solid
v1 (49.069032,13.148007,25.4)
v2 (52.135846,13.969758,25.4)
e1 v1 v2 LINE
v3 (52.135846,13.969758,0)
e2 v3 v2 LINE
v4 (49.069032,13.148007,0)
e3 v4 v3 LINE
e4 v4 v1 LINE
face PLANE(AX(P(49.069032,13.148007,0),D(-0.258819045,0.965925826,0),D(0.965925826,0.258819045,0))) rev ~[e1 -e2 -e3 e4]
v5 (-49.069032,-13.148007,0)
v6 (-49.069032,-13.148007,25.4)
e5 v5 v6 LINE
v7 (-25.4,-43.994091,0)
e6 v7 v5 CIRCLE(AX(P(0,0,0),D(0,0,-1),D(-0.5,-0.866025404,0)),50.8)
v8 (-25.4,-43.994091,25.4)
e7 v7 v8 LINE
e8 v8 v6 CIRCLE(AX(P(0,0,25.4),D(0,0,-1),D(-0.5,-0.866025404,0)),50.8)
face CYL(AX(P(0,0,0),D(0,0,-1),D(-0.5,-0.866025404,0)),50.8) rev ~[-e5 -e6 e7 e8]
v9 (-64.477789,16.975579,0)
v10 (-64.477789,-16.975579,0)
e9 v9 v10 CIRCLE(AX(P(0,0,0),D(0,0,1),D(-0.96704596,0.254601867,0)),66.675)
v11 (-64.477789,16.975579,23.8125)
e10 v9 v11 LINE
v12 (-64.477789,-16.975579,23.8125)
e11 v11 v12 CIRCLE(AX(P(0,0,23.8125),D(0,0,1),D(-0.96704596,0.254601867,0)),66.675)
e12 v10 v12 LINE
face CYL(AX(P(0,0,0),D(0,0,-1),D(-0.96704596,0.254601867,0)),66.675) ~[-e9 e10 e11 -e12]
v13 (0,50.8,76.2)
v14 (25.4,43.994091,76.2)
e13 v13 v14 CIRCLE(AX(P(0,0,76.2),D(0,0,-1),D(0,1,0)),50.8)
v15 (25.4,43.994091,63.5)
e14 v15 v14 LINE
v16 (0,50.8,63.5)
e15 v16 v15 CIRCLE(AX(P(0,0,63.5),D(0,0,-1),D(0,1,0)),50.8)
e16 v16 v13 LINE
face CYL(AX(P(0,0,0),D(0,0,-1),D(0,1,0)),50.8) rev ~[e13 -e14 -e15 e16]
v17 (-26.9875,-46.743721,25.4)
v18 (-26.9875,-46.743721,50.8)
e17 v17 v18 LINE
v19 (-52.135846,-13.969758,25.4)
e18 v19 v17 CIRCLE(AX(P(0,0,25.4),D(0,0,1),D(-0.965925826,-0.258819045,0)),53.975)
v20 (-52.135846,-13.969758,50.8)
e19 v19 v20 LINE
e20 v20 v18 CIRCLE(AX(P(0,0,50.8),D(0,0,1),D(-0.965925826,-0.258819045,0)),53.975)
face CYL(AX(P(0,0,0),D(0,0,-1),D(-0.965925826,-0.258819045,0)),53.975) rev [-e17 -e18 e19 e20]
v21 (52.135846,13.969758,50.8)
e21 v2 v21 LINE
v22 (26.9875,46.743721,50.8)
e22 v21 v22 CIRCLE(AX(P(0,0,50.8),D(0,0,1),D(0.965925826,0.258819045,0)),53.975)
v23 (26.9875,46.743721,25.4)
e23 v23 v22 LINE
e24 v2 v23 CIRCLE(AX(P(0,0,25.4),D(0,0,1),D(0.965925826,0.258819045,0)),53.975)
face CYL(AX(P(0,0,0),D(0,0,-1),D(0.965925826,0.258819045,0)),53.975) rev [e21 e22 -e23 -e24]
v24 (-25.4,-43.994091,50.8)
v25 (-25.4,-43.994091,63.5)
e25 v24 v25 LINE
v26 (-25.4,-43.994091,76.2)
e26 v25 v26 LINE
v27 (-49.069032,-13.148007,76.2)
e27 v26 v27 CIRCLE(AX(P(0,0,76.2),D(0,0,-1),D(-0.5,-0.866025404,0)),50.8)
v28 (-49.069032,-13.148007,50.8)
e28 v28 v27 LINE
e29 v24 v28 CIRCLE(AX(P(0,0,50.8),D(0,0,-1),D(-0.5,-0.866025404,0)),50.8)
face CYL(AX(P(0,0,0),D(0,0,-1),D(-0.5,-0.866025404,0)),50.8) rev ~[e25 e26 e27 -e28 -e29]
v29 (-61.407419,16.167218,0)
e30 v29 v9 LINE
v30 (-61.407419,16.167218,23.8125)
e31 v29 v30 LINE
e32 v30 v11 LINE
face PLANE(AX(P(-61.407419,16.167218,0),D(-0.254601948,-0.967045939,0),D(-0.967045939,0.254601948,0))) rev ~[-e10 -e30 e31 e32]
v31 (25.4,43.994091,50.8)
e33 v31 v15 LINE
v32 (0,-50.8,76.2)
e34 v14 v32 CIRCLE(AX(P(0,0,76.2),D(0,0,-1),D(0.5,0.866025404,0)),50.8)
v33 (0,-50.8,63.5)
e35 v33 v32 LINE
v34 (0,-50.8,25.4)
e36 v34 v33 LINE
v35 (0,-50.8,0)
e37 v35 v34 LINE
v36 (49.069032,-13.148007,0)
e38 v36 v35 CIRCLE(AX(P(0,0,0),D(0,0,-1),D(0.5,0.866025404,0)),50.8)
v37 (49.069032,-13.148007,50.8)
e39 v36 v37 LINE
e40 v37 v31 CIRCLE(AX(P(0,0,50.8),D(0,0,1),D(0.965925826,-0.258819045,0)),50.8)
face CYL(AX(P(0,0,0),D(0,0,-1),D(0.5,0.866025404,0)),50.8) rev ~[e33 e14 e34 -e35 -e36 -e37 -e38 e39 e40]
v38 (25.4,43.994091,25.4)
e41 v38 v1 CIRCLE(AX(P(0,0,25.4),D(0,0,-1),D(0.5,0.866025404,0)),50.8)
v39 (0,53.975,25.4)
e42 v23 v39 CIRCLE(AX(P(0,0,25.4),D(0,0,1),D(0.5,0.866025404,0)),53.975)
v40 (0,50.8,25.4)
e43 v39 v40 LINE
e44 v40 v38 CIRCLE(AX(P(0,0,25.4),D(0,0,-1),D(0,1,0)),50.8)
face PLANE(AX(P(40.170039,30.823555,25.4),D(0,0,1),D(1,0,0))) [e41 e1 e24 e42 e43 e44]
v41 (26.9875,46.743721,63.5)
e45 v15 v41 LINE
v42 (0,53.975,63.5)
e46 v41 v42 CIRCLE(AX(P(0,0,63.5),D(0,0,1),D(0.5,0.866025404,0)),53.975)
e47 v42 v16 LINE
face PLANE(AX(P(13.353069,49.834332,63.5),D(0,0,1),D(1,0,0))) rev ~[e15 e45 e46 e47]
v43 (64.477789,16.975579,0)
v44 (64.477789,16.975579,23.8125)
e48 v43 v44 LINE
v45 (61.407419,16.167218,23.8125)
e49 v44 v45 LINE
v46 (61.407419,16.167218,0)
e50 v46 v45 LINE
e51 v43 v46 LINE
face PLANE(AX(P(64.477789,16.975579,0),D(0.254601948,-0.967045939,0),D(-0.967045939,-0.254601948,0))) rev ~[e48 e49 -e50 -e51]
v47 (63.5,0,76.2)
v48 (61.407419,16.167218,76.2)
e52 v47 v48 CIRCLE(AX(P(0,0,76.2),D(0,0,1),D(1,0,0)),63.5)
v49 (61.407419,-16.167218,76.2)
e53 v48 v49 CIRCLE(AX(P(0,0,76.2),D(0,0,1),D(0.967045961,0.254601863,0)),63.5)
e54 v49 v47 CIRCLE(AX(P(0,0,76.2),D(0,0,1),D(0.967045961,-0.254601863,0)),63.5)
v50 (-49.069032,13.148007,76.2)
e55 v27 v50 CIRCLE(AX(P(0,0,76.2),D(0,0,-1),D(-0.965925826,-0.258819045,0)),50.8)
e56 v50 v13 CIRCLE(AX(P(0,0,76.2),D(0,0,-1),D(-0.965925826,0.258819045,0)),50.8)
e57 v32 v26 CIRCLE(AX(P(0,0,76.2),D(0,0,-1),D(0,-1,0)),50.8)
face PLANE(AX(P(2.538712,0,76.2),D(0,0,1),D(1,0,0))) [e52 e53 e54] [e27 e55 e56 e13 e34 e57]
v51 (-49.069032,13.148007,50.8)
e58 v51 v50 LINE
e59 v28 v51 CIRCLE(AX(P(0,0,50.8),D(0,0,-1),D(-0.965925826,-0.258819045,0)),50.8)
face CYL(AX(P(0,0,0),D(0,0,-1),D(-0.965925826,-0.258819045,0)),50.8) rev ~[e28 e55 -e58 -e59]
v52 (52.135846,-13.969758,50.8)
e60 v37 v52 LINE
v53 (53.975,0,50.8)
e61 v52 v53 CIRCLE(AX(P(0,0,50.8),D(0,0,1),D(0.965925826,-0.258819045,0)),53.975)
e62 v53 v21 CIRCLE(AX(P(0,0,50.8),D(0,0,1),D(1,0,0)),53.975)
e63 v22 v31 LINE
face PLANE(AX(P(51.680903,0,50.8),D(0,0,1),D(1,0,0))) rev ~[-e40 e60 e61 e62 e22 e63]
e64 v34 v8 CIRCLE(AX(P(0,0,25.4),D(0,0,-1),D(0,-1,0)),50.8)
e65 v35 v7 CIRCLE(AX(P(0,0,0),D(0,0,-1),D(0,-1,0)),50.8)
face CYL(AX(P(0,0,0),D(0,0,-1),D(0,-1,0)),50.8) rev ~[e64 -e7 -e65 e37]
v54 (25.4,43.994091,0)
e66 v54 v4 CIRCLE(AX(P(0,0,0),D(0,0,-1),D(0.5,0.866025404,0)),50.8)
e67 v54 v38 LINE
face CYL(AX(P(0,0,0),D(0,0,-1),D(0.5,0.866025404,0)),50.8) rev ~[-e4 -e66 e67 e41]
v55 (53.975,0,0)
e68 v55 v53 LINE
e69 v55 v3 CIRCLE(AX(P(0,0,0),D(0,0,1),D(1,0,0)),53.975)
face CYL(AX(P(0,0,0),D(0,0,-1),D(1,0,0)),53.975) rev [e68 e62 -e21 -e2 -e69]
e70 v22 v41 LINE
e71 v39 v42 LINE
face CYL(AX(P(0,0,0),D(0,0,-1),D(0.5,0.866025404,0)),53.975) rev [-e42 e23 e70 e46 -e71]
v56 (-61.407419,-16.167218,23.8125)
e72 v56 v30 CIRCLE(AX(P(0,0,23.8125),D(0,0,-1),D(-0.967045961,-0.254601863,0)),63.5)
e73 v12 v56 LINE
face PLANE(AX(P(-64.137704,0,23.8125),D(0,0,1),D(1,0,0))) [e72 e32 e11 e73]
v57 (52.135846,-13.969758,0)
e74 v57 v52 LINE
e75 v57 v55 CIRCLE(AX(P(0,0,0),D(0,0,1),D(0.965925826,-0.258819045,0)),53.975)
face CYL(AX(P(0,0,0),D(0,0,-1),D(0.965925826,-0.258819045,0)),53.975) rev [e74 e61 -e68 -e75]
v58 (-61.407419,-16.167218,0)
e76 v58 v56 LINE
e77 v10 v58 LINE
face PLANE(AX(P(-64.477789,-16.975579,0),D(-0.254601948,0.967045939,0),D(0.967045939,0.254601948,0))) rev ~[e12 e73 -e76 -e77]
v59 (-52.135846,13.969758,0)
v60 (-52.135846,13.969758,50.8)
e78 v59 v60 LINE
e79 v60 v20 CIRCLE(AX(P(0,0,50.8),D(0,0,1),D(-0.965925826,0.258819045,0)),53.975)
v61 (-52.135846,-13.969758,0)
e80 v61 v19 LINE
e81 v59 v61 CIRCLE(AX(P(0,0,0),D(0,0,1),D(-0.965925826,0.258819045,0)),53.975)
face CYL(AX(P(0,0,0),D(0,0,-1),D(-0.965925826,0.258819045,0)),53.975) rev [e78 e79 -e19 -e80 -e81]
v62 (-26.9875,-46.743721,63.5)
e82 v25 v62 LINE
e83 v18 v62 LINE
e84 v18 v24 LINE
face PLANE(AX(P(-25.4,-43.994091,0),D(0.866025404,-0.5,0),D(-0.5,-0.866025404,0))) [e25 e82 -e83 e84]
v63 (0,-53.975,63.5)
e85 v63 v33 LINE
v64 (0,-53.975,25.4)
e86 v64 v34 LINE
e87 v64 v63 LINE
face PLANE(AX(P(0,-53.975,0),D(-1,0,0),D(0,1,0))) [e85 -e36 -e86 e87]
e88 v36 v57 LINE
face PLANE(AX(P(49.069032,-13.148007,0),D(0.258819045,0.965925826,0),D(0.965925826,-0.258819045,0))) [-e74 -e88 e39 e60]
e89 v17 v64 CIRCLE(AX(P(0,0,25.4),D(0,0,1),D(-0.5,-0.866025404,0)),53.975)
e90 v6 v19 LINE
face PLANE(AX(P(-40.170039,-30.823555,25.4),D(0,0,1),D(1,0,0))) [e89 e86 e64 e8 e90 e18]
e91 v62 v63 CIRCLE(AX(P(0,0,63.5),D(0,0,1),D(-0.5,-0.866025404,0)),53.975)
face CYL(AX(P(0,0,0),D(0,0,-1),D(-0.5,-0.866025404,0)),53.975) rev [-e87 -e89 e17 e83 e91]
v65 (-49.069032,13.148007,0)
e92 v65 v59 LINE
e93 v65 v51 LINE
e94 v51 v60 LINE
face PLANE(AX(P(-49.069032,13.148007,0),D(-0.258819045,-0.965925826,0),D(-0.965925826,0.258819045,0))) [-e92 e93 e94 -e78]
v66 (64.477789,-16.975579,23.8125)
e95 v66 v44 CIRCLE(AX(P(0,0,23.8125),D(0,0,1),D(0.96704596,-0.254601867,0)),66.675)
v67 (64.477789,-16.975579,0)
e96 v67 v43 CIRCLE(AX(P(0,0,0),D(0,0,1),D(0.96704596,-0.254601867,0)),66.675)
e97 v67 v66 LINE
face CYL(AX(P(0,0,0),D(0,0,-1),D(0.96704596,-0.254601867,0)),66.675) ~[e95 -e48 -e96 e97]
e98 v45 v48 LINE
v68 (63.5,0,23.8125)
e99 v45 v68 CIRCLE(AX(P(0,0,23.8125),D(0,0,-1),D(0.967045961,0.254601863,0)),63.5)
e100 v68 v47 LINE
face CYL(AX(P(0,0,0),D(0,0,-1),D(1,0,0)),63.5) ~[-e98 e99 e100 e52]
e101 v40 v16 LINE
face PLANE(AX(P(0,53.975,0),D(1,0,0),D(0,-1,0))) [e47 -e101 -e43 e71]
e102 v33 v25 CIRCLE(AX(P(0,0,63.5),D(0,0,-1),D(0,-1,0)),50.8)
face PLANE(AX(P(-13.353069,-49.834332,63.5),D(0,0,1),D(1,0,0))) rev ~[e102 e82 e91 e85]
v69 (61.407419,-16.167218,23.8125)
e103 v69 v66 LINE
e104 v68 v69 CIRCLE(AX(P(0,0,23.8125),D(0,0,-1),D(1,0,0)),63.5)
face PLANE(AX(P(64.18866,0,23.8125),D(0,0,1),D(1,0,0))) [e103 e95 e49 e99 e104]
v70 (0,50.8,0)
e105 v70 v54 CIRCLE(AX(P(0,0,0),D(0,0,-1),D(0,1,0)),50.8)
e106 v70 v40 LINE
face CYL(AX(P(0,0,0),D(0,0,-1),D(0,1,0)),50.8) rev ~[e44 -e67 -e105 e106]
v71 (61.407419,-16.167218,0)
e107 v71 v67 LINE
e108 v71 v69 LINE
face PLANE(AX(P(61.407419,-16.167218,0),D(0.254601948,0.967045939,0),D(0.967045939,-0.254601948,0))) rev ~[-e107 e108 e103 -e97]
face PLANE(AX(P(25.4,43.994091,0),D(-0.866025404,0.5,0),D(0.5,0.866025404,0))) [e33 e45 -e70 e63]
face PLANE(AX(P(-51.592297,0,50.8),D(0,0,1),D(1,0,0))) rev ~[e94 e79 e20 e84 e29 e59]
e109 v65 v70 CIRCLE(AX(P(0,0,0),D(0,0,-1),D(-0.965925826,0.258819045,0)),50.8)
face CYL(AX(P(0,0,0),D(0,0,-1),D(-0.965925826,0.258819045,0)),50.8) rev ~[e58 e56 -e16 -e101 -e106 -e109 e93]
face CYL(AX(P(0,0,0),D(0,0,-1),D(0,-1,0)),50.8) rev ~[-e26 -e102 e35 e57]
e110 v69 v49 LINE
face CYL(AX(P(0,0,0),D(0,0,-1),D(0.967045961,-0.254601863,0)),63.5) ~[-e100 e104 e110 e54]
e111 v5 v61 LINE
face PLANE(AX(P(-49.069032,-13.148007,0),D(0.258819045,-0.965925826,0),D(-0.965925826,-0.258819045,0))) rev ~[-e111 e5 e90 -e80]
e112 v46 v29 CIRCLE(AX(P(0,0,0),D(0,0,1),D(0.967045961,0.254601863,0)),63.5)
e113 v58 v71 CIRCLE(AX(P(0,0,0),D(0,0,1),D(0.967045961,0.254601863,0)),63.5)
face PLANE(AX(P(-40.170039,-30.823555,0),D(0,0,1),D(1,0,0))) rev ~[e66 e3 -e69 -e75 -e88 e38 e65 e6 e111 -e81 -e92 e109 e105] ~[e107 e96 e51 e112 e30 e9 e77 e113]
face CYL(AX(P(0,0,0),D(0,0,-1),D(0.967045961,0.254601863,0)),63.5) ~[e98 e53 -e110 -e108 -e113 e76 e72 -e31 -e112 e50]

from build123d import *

# Parameters (mm, degrees)
F1_DEPTH = 76.2
F2_DEPTH = 23.8125
F3_DEPTH = 50.8
F4_DEPTH = 63.5
F5_DEPTH = 25.4


# Not quite as in the source:
# - a feature names something its author has since deleted; it is built from what else it names


with BuildPart() as f1:
    # F0 (on Top) → F1 (new body)
    with BuildSketch(Plane.XY):
        with BuildLine():
            ThreePointArc((61.4074185531, -16.1672182717), (62.9746817305, -8.151040482), (63.5, 0))
            ThreePointArc((63.5, 0), (62.9746817305, 8.151040482), (61.4074185531, 16.1672182717))
            ThreePointArc((61.4074185531, 16.1672182717), (0, 63.5), (-61.4074185531, 16.1672182717))
            ThreePointArc((-61.4074185531, 16.1672182717), (-63.5, 0), (-61.4074185531, -16.1672182717))
            ThreePointArc((-61.4074185531, -16.1672182717), (0, -63.5), (61.4074185531, -16.1672182717))
        make_face()
        with BuildLine():
            ThreePointArc((26.9875, 46.7437211693), (42.8212465422, 32.8578981307), (52.135846474, 13.9697579594))
            ThreePointArc((52.135846474, 13.9697579594), (53.5132363927, 7.0451512251), (53.975, 0))
            ThreePointArc((53.975, 0), (53.5132363927, -7.0451512251), (52.135846474, -13.9697579594))
            ThreePointArc((52.135846474, -13.9697579594), (32.8578981307, -42.8212465422), (0, -53.975))
            ThreePointArc((0, -53.975), (-13.9697579594, -52.135846474), (-26.9875, -46.7437211693))
            ThreePointArc((-26.9875, -46.7437211693), (-42.8212465422, -32.8578981307), (-52.135846474, -13.9697579594))
            ThreePointArc((-52.135846474, -13.9697579594), (-53.975, 0), (-52.135846474, 13.9697579594))
            ThreePointArc((-52.135846474, 13.9697579594), (-32.8578981307, 42.8212465422), (0, 53.975))
            ThreePointArc((0, 53.975), (13.9697579594, 52.135846474), (26.9875, 46.7437211693))
        make_face(mode=Mode.SUBTRACT)
        with BuildLine():
            ThreePointArc((49.0690319755, 13.1480074912), (50.3653989578, 6.6307305648), (50.8, 0))
            ThreePointArc((50.8, 0), (50.3653989578, -6.6307305648), (49.0690319755, -13.1480074912))
            Line((49.0690319755, -13.1480074912), (52.135846474, -13.9697579594))
            ThreePointArc((52.135846474, -13.9697579594), (53.5132363927, -7.0451512251), (53.975, 0))
            ThreePointArc((53.975, 0), (53.5132363927, 7.0451512251), (52.135846474, 13.9697579594))
            Line((52.135846474, 13.9697579594), (49.0690319755, 13.1480074912))
        make_face()
        with BuildLine():
            ThreePointArc((25.4, 43.9940905122), (40.3023496868, 30.9250805936), (49.0690319755, 13.1480074912))
            Line((49.0690319755, 13.1480074912), (52.135846474, 13.9697579594))
            ThreePointArc((52.135846474, 13.9697579594), (42.8212465422, 32.8578981307), (26.9875, 46.7437211693))
            Line((26.9875, 46.7437211693), (25.4, 43.9940905122))
        make_face()
        with BuildLine():
            Line((52.135846474, -13.9697579594), (49.0690319755, -13.1480074912))
            ThreePointArc((49.0690319755, -13.1480074912), (30.9250805936, -40.3023496868), (0, -50.8))
            Line((0, -50.8), (0, -53.975))
            ThreePointArc((0, -53.975), (32.8578981307, -42.8212465422), (52.135846474, -13.9697579594))
        make_face()
        with BuildLine():
            ThreePointArc((0, 50.8), (13.1480074912, 49.0690319755), (25.4, 43.9940905122))
            Line((25.4, 43.9940905122), (26.9875, 46.7437211693))
            ThreePointArc((26.9875, 46.7437211693), (13.9697579594, 52.135846474), (0, 53.975))
            Line((0, 53.975), (0, 50.8))
        make_face()
        with BuildLine():
            Line((0, -53.975), (0, -50.8))
            ThreePointArc((0, -50.8), (-13.1480074912, -49.0690319755), (-25.4, -43.9940905122))
            Line((-25.4, -43.9940905122), (-26.9875, -46.7437211693))
            ThreePointArc((-26.9875, -46.7437211693), (-13.9697579594, -52.135846474), (0, -53.975))
        make_face()
        with BuildLine():
            ThreePointArc((-49.0690319755, 13.1480074912), (-30.9250805936, 40.3023496868), (0, 50.8))
            Line((0, 50.8), (0, 53.975))
            ThreePointArc((0, 53.975), (-32.8578981307, 42.8212465422), (-52.135846474, 13.9697579594))
            Line((-52.135846474, 13.9697579594), (-49.0690319755, 13.1480074912))
        make_face()
        with BuildLine():
            Line((-26.9875, -46.7437211693), (-25.4, -43.9940905122))
            ThreePointArc((-25.4, -43.9940905122), (-40.3023496868, -30.9250805936), (-49.0690319755, -13.1480074912))
            Line((-49.0690319755, -13.1480074912), (-52.135846474, -13.9697579594))
            ThreePointArc((-52.135846474, -13.9697579594), (-42.8212465422, -32.8578981307), (-26.9875, -46.7437211693))
        make_face()
        with BuildLine():
            ThreePointArc((-49.0690319755, -13.1480074912), (-50.8, 0), (-49.0690319755, 13.1480074912))
            Line((-49.0690319755, 13.1480074912), (-52.135846474, 13.9697579594))
            ThreePointArc((-52.135846474, 13.9697579594), (-53.975, 0), (-52.135846474, -13.9697579594))
            Line((-52.135846474, -13.9697579594), (-49.0690319755, -13.1480074912))
        make_face()
    extrude(amount=F1_DEPTH)

    # F0 (on Top) → F2 (join)
    with BuildSketch(Plane.XY):
        with BuildLine():
            ThreePointArc((-61.4074185531, -16.1672182717), (-63.5, 0), (-61.4074185531, 16.1672182717))
            Line((-61.4074185531, 16.1672182717), (-64.4777894091, 16.9755794573))
            ThreePointArc((-64.4777894091, 16.9755794573), (-66.675, 0), (-64.4777894091, -16.9755794573))
            Line((-64.4777894091, -16.9755794573), (-61.4074185531, -16.1672182717))
        make_face()
        with BuildLine():
            ThreePointArc((61.4074185531, 16.1672182717), (62.9746817305, 8.151040482), (63.5, 0))
            ThreePointArc((63.5, 0), (62.9746817305, -8.151040482), (61.4074185531, -16.1672182717))
            Line((61.4074185531, -16.1672182717), (64.4777894091, -16.9755794573))
            ThreePointArc((64.4777894091, -16.9755794573), (66.675, 0), (64.4777894091, 16.9755794573))
            Line((64.4777894091, 16.9755794573), (61.4074185531, 16.1672182717))
        make_face()
    extrude(amount=F2_DEPTH)

    # F0 (on Top) → F3 (cut)
    with BuildSketch(Plane.XY):
        with BuildLine():
            ThreePointArc((-49.0690319755, -13.1480074912), (-50.8, 0), (-49.0690319755, 13.1480074912))
            Line((-49.0690319755, 13.1480074912), (-52.135846474, 13.9697579594))
            ThreePointArc((-52.135846474, 13.9697579594), (-53.975, 0), (-52.135846474, -13.9697579594))
            Line((-52.135846474, -13.9697579594), (-49.0690319755, -13.1480074912))
        make_face()
        with BuildLine():
            ThreePointArc((49.0690319755, 13.1480074912), (50.3653989578, 6.6307305648), (50.8, 0))
            ThreePointArc((50.8, 0), (50.3653989578, -6.6307305648), (49.0690319755, -13.1480074912))
            Line((49.0690319755, -13.1480074912), (52.135846474, -13.9697579594))
            ThreePointArc((52.135846474, -13.9697579594), (53.5132363927, -7.0451512251), (53.975, 0))
            ThreePointArc((53.975, 0), (53.5132363927, 7.0451512251), (52.135846474, 13.9697579594))
            Line((52.135846474, 13.9697579594), (49.0690319755, 13.1480074912))
        make_face()
        with BuildLine():
            Line((-26.9875, -46.7437211693), (-25.4, -43.9940905122))
            ThreePointArc((-25.4, -43.9940905122), (-40.3023496868, -30.9250805936), (-49.0690319755, -13.1480074912))
            Line((-49.0690319755, -13.1480074912), (-52.135846474, -13.9697579594))
            ThreePointArc((-52.135846474, -13.9697579594), (-42.8212465422, -32.8578981307), (-26.9875, -46.7437211693))
        make_face()
        with BuildLine():
            ThreePointArc((25.4, 43.9940905122), (40.3023496868, 30.9250805936), (49.0690319755, 13.1480074912))
            Line((49.0690319755, 13.1480074912), (52.135846474, 13.9697579594))
            ThreePointArc((52.135846474, 13.9697579594), (42.8212465422, 32.8578981307), (26.9875, 46.7437211693))
            Line((26.9875, 46.7437211693), (25.4, 43.9940905122))
        make_face()
    extrude(amount=F3_DEPTH, mode=Mode.SUBTRACT)

    # F0 (on Top) → F4 (cut)
    with BuildSketch(Plane.XY):
        with BuildLine():
            Line((0, -53.975), (0, -50.8))
            ThreePointArc((0, -50.8), (-13.1480074912, -49.0690319755), (-25.4, -43.9940905122))
            Line((-25.4, -43.9940905122), (-26.9875, -46.7437211693))
            ThreePointArc((-26.9875, -46.7437211693), (-13.9697579594, -52.135846474), (0, -53.975))
        make_face()
        with BuildLine():
            ThreePointArc((0, 50.8), (13.1480074912, 49.0690319755), (25.4, 43.9940905122))
            Line((25.4, 43.9940905122), (26.9875, 46.7437211693))
            ThreePointArc((26.9875, 46.7437211693), (13.9697579594, 52.135846474), (0, 53.975))
            Line((0, 53.975), (0, 50.8))
        make_face()
    extrude(amount=F4_DEPTH, mode=Mode.SUBTRACT)

    # F0 (on Top) → F5 (join)
    with BuildSketch(Plane.XY):
        with BuildLine():
            Line((-26.9875, -46.7437211693), (-25.4, -43.9940905122))
            ThreePointArc((-25.4, -43.9940905122), (-40.3023496868, -30.9250805936), (-49.0690319755, -13.1480074912))
            Line((-49.0690319755, -13.1480074912), (-52.135846474, -13.9697579594))
            ThreePointArc((-52.135846474, -13.9697579594), (-42.8212465422, -32.8578981307), (-26.9875, -46.7437211693))
        make_face()
        with BuildLine():
            Line((0, -53.975), (0, -50.8))
            ThreePointArc((0, -50.8), (-13.1480074912, -49.0690319755), (-25.4, -43.9940905122))
            Line((-25.4, -43.9940905122), (-26.9875, -46.7437211693))
            ThreePointArc((-26.9875, -46.7437211693), (-13.9697579594, -52.135846474), (0, -53.975))
        make_face()
        with BuildLine():
            ThreePointArc((25.4, 43.9940905122), (40.3023496868, 30.9250805936), (49.0690319755, 13.1480074912))
            Line((49.0690319755, 13.1480074912), (52.135846474, 13.9697579594))
            ThreePointArc((52.135846474, 13.9697579594), (42.8212465422, 32.8578981307), (26.9875, 46.7437211693))
            Line((26.9875, 46.7437211693), (25.4, 43.9940905122))
        make_face()
        with BuildLine():
            ThreePointArc((0, 50.8), (13.1480074912, 49.0690319755), (25.4, 43.9940905122))
            Line((25.4, 43.9940905122), (26.9875, 46.7437211693))
            ThreePointArc((26.9875, 46.7437211693), (13.9697579594, 52.135846474), (0, 53.975))
            Line((0, 53.975), (0, 50.8))
        make_face()
    extrude(amount=F5_DEPTH)


solid = f1.part
